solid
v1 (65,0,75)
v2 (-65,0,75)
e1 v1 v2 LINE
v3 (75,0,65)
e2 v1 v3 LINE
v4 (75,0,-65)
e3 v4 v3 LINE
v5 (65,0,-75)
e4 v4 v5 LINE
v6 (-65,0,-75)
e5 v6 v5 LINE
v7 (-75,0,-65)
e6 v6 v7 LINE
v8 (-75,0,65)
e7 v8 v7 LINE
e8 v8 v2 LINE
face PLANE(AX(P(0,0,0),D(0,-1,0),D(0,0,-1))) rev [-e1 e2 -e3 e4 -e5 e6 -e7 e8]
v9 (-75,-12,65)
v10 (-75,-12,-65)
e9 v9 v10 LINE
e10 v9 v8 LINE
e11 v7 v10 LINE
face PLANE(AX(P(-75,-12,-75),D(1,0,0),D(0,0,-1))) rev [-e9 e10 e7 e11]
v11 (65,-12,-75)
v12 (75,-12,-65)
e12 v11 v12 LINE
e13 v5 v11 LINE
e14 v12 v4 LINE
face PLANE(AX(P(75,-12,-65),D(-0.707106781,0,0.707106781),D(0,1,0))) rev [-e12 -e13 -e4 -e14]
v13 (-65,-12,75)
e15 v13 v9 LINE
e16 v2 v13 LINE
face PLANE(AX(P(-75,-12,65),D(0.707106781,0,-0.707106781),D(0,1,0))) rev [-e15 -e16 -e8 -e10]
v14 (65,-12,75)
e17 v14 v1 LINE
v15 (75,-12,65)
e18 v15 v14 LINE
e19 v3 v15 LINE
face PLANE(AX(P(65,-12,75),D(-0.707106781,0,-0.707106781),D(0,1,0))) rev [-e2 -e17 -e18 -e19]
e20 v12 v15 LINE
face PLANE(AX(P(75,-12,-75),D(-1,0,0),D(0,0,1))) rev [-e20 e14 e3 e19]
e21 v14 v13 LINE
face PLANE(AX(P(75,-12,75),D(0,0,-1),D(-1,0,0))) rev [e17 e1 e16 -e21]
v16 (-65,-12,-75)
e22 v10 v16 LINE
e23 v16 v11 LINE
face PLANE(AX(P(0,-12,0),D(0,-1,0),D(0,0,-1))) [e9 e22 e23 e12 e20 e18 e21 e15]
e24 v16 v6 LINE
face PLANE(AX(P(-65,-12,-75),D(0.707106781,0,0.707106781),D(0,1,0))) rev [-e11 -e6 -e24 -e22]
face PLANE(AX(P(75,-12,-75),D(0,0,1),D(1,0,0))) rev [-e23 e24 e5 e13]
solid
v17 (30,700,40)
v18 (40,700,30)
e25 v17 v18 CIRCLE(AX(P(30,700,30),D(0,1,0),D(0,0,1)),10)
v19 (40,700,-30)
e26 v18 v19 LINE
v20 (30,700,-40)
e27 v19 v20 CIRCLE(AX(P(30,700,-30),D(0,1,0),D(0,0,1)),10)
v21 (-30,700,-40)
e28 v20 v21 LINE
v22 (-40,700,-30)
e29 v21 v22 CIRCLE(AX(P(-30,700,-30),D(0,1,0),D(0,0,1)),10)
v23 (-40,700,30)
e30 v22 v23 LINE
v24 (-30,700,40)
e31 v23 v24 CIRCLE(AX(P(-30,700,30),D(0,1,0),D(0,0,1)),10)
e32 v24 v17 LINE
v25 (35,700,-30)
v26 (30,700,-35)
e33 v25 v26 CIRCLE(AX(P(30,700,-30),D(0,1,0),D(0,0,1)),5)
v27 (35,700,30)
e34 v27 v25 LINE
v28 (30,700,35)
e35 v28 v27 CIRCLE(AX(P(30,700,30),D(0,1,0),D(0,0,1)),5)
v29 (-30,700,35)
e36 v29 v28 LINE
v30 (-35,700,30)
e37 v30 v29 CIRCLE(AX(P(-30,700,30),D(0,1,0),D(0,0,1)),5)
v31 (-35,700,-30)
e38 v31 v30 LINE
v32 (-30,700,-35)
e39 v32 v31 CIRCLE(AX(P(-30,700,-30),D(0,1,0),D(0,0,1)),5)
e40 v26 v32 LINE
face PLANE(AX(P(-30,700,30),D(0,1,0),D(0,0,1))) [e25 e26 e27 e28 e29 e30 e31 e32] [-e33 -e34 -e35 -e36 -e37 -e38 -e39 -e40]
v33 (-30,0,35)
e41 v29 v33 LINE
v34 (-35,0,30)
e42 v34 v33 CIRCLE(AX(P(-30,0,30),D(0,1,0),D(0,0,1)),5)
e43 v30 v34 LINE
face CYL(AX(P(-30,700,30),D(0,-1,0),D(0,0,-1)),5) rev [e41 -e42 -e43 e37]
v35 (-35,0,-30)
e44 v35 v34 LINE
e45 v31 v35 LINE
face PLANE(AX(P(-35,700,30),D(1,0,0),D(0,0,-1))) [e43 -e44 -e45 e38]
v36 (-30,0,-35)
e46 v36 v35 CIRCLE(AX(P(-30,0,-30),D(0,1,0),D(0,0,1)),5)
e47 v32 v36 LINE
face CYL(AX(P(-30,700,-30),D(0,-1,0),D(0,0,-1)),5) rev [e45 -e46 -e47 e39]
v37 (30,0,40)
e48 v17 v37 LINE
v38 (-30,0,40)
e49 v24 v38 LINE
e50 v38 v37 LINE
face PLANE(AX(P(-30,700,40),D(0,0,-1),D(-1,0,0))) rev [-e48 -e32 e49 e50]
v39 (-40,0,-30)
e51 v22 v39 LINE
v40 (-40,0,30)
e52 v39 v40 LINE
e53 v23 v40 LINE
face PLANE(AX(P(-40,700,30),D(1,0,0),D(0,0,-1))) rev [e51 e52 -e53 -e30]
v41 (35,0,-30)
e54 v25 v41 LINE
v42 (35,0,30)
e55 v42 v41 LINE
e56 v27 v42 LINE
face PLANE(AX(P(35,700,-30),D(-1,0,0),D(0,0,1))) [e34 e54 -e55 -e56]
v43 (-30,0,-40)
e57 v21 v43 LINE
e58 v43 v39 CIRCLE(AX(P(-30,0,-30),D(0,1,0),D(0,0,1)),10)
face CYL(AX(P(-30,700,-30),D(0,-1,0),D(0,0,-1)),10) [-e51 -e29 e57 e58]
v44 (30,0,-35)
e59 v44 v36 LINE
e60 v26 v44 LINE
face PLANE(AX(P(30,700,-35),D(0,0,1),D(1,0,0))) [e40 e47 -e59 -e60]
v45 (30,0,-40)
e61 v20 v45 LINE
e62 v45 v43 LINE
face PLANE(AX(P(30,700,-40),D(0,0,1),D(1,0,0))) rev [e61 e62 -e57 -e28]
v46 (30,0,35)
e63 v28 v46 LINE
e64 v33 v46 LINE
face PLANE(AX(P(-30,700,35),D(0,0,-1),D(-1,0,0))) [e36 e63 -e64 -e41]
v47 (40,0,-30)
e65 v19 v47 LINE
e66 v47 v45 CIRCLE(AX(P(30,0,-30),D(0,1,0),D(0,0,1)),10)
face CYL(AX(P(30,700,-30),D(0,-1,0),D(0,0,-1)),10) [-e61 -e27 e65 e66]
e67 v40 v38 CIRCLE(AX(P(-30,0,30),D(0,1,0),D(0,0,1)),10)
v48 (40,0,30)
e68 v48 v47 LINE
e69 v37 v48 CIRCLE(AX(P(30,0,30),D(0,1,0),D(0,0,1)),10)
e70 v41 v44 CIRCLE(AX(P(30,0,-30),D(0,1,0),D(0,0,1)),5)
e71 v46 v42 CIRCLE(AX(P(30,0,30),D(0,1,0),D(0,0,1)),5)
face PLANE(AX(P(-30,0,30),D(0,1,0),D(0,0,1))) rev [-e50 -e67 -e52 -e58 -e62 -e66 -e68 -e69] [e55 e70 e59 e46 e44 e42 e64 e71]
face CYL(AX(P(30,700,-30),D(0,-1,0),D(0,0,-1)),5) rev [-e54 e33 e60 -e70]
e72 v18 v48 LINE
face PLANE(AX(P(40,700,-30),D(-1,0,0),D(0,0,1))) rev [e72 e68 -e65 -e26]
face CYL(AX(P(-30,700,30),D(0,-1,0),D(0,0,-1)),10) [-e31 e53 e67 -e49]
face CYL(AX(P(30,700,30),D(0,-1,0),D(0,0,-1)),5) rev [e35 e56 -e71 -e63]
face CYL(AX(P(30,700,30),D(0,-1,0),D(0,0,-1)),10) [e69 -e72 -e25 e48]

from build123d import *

# Parameters (mm, degrees)
SQUARE_TUBE_80_X_80_X_5_1_DEPTH = 700
SKETCH12_W                      = 150
SKETCH12_H                      = 150
BASE_FLANGE1_DEPTH              = 12
BREAK_CORNER1_START             = -12
BREAK_CORNER1_DEPTH             = 12


# Read off the part's stored shape, not the designer's step: Break-Corner1
# Sheet-metal steps are written as plain solids
with BuildPart() as part:
    # Sketch11 → Square tube 80 X 80 X 5(1) (new body)
    with BuildSketch(Plane(origin=(0, 0, 0), x_dir=(-1, 0, 0), z_dir=(0, 1, 0))):
        with BuildLine():
            Line((-30, -40), (30, -40))
            ThreePointArc((30, -40), (37.071067812, -37.071067812), (40, -30))
            Line((40, -30), (40, 30))
            ThreePointArc((40, 30), (37.071067812, 37.071067812), (30, 40))
            Line((30, 40), (-30, 40))
            ThreePointArc((-30, 40), (-37.071067812, 37.071067812), (-40, 30))
            Line((-40, 30), (-40, -30))
            ThreePointArc((-40, -30), (-37.071067812, -37.071067812), (-30, -40))
        make_face()
        with BuildLine():
            Line((-30, -35), (30, -35))
            ThreePointArc((30, -35), (33.535533906, -33.535533906), (35, -30))
            Line((35, -30), (35, 30))
            ThreePointArc((35, 30), (33.535533906, 33.535533906), (30, 35))
            Line((30, 35), (-30, 35))
            ThreePointArc((-30, 35), (-33.535533906, 33.535533906), (-35, 30))
            Line((-35, 30), (-35, -30))
            ThreePointArc((-35, -30), (-33.535533906, -33.535533906), (-30, -35))
        make_face(mode=Mode.SUBTRACT)
    extrude(amount=SQUARE_TUBE_80_X_80_X_5_1_DEPTH)


with BuildPart() as body_2:
    # Sketch12 → Base-Flange1 (new body)
    with BuildSketch(Plane.XZ):
        Rectangle(SKETCH12_W, SKETCH12_H)
    extrude(amount=BASE_FLANGE1_DEPTH)

    # Break-Corner1 outline → Break-Corner1 (cut)
    with BuildSketch(Plane(origin=(0, 0, 0), x_dir=(1, 0, 0), z_dir=(0, 1, 0)).offset(BREAK_CORNER1_START)):
        Polygon((75, -75), (75, -65), (65, -75), align=None)
        Polygon((65, 75), (75, 65), (75, 75), align=None)
        Polygon((-75, -75), (-65, -75), (-75, -65), align=None)
        Polygon((-75, 65), (-65, 75), (-75, 75), align=None)
    extrude(amount=BREAK_CORNER1_DEPTH, mode=Mode.SUBTRACT)


solid = Compound([part.part, body_2.part])
